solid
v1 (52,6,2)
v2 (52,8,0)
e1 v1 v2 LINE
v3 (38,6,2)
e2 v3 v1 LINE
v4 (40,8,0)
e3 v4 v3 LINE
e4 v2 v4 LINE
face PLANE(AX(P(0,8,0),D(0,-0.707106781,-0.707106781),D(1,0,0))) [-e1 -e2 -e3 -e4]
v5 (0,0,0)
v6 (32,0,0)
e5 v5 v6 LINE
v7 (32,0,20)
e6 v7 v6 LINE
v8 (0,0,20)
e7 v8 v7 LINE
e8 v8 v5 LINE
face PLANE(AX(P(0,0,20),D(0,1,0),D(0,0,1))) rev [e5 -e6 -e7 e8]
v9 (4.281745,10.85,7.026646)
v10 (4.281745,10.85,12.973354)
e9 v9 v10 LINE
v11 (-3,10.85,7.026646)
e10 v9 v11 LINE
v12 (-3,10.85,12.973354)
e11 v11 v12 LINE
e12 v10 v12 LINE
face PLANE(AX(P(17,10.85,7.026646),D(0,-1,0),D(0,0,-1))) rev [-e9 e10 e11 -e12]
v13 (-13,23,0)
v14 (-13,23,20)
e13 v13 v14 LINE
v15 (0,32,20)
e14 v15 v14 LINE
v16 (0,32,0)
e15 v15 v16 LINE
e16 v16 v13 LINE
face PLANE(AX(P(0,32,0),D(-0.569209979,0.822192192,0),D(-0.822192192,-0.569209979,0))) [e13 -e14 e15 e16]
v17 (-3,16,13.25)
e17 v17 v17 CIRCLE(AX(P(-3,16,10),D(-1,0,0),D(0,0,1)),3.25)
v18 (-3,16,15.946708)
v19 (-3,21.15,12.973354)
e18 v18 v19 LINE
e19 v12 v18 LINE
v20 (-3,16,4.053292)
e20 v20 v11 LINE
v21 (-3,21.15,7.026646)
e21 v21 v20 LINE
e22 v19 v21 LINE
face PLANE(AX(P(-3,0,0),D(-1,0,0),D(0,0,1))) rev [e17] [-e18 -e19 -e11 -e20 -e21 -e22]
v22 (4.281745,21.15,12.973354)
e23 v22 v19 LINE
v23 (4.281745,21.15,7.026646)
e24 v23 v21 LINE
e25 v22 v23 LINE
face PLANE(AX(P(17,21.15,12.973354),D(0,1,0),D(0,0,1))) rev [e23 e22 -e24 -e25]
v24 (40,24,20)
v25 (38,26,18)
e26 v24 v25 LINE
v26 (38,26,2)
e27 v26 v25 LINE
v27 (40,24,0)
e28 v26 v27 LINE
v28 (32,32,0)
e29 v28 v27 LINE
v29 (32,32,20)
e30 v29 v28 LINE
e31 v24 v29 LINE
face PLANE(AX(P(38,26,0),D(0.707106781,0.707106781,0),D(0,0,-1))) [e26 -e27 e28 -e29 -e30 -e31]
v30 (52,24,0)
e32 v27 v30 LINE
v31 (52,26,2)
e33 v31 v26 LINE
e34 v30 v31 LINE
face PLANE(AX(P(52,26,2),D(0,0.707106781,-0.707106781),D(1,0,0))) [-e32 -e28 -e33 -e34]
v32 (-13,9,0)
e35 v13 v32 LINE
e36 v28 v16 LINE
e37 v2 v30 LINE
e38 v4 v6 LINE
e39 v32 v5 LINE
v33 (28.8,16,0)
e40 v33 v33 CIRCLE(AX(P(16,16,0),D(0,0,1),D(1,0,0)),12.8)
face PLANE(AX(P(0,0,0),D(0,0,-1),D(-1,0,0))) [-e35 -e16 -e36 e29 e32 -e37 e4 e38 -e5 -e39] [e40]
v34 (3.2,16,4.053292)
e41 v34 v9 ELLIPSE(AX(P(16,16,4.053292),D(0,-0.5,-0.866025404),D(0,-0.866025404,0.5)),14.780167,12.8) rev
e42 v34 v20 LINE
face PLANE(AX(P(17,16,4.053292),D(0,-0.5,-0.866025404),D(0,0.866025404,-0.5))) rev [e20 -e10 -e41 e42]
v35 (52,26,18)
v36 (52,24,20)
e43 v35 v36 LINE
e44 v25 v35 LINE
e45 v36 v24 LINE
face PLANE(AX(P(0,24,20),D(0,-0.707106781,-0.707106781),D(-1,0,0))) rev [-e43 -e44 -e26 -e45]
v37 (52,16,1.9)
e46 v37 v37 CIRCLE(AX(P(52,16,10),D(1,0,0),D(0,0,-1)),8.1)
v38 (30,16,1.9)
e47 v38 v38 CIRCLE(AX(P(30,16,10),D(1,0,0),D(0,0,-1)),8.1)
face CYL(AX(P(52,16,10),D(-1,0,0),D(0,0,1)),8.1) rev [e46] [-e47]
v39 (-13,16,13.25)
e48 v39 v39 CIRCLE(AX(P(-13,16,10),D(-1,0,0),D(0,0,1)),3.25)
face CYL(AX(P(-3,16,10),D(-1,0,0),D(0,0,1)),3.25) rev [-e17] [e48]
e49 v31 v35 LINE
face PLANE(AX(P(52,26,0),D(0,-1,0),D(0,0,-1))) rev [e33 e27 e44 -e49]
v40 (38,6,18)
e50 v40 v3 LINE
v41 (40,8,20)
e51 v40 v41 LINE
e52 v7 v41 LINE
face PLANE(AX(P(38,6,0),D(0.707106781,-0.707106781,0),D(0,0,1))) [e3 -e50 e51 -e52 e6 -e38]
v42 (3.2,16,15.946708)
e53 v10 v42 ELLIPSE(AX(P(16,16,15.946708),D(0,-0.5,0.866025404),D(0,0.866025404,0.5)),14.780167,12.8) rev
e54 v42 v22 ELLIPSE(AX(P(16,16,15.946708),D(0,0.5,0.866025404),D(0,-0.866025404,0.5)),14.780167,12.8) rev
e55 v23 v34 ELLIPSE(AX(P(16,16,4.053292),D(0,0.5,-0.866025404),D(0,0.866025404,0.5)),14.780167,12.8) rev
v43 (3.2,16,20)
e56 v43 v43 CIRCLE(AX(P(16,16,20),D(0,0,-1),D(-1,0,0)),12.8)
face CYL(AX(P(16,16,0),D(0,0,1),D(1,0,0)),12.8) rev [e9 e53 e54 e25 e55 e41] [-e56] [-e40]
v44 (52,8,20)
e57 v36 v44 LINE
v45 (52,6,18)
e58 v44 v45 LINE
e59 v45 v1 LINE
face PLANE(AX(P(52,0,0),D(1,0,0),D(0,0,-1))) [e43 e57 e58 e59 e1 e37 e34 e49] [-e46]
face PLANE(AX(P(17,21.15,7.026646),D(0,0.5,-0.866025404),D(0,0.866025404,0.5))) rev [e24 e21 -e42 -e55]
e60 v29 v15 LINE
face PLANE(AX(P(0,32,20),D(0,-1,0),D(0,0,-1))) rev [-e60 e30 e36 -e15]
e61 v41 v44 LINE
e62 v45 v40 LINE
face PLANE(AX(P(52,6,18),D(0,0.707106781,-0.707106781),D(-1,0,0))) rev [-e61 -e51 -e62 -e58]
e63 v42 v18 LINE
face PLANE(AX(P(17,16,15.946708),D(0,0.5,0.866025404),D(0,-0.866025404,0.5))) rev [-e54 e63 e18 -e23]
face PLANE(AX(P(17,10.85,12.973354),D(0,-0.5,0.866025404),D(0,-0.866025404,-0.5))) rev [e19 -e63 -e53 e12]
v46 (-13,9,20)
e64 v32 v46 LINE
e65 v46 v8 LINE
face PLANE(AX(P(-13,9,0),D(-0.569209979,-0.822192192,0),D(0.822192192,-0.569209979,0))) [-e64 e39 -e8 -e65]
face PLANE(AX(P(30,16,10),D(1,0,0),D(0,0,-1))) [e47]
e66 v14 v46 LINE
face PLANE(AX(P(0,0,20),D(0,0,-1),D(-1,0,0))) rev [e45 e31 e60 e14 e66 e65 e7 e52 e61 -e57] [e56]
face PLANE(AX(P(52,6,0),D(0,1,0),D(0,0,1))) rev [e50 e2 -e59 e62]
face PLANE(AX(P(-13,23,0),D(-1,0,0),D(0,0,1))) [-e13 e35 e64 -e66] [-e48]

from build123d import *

# Parameters (mm, degrees)
ESQUISSE1_W                  = 32
ESQUISSE1_H                  = 32
BOSS_EXTRU_1_DEPTH           = 20
ENL_V_MAT_EXTRU_1_DEPTH      = 50.477267507
ENL_V_MAT_EXTRU_1_DEPTH_BACK = 50.477267507
ESQUISSE2_R                  = 12.8
BOSS_EXTRU_2_DEPTH           = 20
ESQUISSE4_R                  = 3.25
ENL_V_MAT_EXTRU_2_DEPTH      = 10
ENL_V_MAT_EXTRU_3_DEPTH      = 20
ESQUISSE6_W                  = 20
ESQUISSE6_H                  = 20
ESQUISSE6_R                  = 8.1
BOSS_EXTRU_3_DEPTH           = 20
CHANFREIN1_SIZE              = 6
CHANFREIN2_SIZE              = 2
ENL_V_START                  = -2
ESQUISSE7_R                  = 8.1
ENL_V_MAT_EXTRU_4_DEPTH      = 2


with BuildPart() as part:
    # Esquisse1 → Boss.-Extru.1 (new body)
    with BuildSketch(Plane.XY):
        with Locations((16, 16)):
            Rectangle(ESQUISSE1_W, ESQUISSE1_H)
    extrude(amount=BOSS_EXTRU_1_DEPTH)

    # Esquisse2 → Enlèv. mat.-Extru.1 (cut, two sides: drawn at the far end of the back side and taken through both)
    with BuildSketch(Plane.XY.offset(20).offset(-ENL_V_MAT_EXTRU_1_DEPTH_BACK)):
        with Locations((16, 16)):
            Circle(ESQUISSE2_R)
    extrude(amount=ENL_V_MAT_EXTRU_1_DEPTH + ENL_V_MAT_EXTRU_1_DEPTH_BACK, mode=Mode.SUBTRACT)

    # Esquisse3 → Boss.-Extru.2 (add)
    with BuildSketch(Plane.XY.offset(20)):
        Polygon((0, 0), (0, 32), (-13, 23), (-13, 9), align=None)
    extrude(amount=-BOSS_EXTRU_2_DEPTH)

    # Esquisse4 → Enlèv. mat.-Extru.2 (cut)
    with BuildSketch(Plane.ZY.offset(13)):
        with Locations((10, 16)):
            Circle(ESQUISSE4_R)
    extrude(amount=-ENL_V_MAT_EXTRU_2_DEPTH, mode=Mode.SUBTRACT)

    # Esquisse5 → Enlèv. mat.-Extru.3 (cut)
    with BuildSketch(Plane.ZY.offset(3)):
        Polygon((12.973353886, 10.85), (15.946707773, 16), (12.973353886, 21.15), (7.026646114, 21.15), (4.053292227, 16), (7.026646114, 10.85), align=None)
    extrude(amount=-ENL_V_MAT_EXTRU_3_DEPTH, mode=Mode.SUBTRACT)

    # Esquisse6 → Boss.-Extru.3 (add)
    with BuildSketch(Plane(origin=(32, 0, 0), x_dir=(0, 0, -1), z_dir=(1, 0, 0))):
        with Locations((-10, 16)):
            Rectangle(ESQUISSE6_W, ESQUISSE6_H)
        with Locations((-10, 16)):
            Circle(ESQUISSE6_R, mode=Mode.SUBTRACT)
    extrude(amount=BOSS_EXTRU_3_DEPTH)

    # Chanfrein1
    chanfrein1_edges = [part.edges().sort_by_distance(p)[0] for p in [
        (32, 6, 10),
        (32, 26, 10),
    ]]
    chamfer(chanfrein1_edges, length=CHANFREIN1_SIZE - 0.0001)  # a hair under: the kernel refuses the full size

    # Chanfrein2
    chanfrein2_edges = [part.edges().sort_by_distance(p)[0] for p in [
        (44.99995, 6, 20),
        (44.99995, 6, 0),
        (44.99995, 26, 0),
        (44.99995, 26, 20),
    ]]
    chamfer(chanfrein2_edges, length=CHANFREIN2_SIZE)

    # Esquisse7 → Enlèv. mat.-Extru.4 (cut)
    with BuildSketch(Plane(origin=(32, 0, 0), x_dir=(0, 0, -1), z_dir=(1, 0, 0)).offset(ENL_V_START)):
        with Locations((-10, 16)):
            Circle(ESQUISSE7_R)
    extrude(amount=ENL_V_MAT_EXTRU_4_DEPTH, mode=Mode.SUBTRACT)


solid = part.part
